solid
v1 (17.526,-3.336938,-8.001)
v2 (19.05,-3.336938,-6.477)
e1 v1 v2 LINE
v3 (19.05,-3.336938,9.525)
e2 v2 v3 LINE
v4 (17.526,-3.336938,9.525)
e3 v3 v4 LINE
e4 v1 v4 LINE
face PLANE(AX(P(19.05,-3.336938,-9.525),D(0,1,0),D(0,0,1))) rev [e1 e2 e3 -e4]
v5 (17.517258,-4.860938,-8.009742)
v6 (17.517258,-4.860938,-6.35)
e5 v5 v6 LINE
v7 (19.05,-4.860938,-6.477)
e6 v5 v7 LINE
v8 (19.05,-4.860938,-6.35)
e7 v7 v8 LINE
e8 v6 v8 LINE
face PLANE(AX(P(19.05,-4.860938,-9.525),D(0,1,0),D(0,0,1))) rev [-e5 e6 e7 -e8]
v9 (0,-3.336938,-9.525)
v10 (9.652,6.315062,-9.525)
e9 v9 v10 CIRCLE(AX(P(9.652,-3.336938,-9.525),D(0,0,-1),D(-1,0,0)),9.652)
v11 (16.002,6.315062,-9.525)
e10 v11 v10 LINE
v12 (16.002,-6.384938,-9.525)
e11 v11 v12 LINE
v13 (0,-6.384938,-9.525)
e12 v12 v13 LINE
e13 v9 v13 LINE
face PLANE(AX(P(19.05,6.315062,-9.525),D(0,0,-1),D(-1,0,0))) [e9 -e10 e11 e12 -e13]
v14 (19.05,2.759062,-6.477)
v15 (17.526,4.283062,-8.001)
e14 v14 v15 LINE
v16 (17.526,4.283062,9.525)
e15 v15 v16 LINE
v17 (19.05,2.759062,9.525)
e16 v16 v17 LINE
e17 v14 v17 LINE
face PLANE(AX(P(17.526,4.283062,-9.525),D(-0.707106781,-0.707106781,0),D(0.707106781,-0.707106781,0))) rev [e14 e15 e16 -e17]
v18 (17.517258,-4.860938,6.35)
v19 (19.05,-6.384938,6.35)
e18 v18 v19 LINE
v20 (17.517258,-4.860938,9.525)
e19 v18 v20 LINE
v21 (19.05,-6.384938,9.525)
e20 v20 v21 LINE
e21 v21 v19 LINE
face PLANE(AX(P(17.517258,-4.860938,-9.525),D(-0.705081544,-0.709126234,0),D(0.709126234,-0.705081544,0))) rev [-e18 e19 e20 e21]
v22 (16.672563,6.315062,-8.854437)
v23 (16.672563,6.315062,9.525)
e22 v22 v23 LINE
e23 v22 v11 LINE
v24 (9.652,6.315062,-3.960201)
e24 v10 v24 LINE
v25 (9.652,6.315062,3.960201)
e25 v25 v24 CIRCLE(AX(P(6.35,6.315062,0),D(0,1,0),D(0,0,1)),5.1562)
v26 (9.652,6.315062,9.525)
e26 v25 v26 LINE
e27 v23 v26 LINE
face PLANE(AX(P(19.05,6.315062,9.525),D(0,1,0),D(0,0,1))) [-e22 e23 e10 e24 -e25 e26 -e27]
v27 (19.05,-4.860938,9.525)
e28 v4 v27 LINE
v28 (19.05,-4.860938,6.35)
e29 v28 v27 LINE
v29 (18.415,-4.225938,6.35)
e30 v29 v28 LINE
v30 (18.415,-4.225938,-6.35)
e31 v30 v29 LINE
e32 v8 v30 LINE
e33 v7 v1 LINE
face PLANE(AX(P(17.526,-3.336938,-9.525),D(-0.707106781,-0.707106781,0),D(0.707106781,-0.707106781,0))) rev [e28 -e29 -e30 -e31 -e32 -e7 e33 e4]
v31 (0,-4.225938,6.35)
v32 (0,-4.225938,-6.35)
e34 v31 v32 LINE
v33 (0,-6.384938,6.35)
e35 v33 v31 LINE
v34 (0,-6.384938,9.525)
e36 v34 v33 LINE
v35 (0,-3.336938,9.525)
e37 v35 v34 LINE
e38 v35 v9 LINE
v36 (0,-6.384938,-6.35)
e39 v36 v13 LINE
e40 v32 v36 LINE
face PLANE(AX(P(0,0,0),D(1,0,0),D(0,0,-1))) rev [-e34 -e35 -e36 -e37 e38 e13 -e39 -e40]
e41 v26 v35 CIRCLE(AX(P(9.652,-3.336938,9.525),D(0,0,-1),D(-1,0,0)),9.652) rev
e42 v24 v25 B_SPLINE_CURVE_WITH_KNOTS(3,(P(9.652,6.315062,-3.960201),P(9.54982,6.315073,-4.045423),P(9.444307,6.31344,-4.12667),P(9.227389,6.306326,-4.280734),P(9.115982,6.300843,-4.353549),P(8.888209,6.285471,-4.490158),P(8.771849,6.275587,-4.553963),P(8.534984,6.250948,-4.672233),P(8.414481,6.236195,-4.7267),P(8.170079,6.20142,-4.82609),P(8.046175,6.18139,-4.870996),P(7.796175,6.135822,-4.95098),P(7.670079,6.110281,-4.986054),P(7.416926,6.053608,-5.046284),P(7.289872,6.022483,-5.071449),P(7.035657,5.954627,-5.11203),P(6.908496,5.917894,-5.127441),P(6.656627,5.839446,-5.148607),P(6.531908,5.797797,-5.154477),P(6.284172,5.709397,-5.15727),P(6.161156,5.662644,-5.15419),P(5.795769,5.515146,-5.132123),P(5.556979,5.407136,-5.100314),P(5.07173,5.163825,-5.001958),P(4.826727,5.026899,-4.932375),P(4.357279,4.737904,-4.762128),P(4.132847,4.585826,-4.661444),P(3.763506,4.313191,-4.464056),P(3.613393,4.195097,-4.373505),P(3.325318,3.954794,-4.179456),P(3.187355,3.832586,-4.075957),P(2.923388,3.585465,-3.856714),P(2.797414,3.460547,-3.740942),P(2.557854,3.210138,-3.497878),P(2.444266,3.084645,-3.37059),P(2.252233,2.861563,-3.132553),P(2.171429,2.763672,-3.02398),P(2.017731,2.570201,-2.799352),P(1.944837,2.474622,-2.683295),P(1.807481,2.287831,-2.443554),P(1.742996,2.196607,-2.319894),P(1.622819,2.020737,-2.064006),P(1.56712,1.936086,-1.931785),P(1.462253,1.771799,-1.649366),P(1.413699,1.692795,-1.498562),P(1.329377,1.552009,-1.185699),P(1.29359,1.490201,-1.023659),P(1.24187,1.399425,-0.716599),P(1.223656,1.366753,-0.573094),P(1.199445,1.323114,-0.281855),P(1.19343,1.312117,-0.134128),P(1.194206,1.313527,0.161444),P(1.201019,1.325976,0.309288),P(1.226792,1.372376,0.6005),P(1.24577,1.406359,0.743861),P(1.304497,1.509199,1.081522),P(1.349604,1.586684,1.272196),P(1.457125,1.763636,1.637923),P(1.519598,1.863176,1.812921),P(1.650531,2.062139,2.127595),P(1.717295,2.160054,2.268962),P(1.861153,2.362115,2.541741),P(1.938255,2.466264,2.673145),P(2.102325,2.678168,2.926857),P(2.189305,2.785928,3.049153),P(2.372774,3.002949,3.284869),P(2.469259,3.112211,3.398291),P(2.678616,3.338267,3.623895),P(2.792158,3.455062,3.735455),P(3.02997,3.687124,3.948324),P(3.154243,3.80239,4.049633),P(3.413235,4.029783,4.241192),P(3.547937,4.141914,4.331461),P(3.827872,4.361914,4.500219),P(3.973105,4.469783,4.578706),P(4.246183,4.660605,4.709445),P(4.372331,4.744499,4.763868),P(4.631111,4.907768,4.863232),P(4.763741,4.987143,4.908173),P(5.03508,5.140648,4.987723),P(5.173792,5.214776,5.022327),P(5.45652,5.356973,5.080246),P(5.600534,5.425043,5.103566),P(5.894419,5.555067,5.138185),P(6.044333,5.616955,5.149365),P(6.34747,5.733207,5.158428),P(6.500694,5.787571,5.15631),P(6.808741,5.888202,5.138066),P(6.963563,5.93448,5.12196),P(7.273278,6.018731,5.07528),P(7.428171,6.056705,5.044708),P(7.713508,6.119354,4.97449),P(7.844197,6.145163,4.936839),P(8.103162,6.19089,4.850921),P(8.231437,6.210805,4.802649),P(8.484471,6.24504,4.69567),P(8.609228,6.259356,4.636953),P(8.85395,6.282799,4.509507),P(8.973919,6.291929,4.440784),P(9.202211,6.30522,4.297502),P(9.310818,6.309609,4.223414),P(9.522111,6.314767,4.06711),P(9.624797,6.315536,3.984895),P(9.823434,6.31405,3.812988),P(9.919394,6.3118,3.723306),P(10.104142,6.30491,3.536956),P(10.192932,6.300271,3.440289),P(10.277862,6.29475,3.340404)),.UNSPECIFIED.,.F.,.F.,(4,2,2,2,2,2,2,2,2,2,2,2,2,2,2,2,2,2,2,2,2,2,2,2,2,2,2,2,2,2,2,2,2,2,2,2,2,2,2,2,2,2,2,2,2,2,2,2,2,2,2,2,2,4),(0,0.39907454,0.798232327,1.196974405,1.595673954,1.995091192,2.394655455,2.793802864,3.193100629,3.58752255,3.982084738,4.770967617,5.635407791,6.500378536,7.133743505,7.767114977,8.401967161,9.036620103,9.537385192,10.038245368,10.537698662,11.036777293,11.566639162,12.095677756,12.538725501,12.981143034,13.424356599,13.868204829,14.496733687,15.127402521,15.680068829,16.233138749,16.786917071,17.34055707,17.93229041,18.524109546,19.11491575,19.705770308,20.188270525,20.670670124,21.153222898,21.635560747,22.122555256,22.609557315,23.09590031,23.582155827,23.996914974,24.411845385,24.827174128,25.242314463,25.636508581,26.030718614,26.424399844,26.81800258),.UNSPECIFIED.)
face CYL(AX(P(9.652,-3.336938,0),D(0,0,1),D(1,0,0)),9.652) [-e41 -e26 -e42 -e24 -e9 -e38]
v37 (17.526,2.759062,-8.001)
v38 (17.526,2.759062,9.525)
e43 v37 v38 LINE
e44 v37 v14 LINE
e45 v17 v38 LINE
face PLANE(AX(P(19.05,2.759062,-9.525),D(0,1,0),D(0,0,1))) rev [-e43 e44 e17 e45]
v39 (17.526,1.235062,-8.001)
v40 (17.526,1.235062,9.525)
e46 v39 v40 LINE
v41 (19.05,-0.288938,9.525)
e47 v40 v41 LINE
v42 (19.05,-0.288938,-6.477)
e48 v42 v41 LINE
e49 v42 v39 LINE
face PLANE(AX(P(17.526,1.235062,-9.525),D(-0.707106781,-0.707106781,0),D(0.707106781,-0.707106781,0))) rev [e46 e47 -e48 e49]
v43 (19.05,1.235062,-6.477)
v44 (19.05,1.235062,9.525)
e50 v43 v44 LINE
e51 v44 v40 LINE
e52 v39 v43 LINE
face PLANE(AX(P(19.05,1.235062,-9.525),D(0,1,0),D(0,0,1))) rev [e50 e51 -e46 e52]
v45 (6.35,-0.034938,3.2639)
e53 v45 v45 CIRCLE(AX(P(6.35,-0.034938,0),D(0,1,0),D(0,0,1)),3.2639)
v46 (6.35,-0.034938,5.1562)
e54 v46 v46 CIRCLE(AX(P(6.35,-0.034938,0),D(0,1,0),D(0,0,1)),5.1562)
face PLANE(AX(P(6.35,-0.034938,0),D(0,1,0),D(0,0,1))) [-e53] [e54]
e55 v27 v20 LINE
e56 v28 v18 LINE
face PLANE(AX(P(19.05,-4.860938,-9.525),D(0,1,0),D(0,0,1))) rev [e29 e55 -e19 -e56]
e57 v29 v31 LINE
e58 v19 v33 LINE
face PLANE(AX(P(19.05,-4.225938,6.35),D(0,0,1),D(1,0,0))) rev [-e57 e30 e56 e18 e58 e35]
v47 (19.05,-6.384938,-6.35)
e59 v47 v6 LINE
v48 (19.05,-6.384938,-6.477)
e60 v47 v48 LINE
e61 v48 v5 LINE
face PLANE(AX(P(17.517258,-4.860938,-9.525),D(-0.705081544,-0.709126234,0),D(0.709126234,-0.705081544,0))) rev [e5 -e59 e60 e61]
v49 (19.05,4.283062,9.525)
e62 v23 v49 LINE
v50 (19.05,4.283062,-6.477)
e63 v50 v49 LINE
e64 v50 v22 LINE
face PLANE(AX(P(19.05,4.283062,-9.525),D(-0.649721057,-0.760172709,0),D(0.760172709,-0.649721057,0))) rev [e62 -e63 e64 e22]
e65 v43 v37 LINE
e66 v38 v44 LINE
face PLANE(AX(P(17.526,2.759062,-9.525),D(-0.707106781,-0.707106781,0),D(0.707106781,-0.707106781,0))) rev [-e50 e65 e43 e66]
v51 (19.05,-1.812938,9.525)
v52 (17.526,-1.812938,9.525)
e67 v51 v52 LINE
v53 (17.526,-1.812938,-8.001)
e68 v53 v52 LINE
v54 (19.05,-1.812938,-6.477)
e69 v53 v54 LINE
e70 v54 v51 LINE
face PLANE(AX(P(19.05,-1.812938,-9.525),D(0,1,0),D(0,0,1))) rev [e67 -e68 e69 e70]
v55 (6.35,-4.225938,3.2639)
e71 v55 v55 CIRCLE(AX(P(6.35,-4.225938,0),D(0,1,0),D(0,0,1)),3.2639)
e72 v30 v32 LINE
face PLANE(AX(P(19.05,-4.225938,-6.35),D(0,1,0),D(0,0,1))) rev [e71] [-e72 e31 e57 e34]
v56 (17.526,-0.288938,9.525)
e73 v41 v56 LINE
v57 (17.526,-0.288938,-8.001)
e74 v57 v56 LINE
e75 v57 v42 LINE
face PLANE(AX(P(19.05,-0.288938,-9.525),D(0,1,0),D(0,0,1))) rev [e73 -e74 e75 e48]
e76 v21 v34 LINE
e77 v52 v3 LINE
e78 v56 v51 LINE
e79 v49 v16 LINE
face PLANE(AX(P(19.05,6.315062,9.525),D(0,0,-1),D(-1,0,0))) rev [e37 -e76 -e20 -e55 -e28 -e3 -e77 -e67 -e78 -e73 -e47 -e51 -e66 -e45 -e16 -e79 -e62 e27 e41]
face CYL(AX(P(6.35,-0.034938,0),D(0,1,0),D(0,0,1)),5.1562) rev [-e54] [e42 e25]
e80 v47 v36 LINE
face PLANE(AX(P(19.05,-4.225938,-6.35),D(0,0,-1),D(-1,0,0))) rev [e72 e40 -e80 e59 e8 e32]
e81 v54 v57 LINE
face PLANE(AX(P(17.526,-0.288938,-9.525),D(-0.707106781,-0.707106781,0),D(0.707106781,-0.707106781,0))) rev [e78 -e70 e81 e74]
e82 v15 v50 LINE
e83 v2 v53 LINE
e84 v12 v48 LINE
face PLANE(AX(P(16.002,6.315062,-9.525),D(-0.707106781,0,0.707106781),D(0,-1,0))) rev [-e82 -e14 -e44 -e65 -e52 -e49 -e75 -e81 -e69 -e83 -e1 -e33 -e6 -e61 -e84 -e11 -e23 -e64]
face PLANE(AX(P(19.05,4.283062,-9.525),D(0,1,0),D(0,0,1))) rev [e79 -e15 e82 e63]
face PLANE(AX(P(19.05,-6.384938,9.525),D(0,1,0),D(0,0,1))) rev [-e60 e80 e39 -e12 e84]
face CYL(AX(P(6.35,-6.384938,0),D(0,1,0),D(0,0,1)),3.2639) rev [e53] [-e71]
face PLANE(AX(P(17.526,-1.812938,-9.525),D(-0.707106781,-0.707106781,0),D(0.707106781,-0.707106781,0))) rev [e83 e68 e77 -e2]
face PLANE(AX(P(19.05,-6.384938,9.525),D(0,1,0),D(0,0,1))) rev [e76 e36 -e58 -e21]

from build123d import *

# Parameters (mm, degrees)
CROQUIS1_W              = 19.05
CROQUIS1_H              = 12.7
SALIENTE_EXTRUIR1_DEPTH = 19.05
CROQUIS2_W              = 12.7
CROQUIS2_H              = 2.159
CORTAR_EXTRUIR1_DEPTH   = 23.235007389
CHAFL_N1_SIZE           = 3.048
CROQUIS9_R              = 5.1562
CORTAR_EXTRUIR4_DEPTH   = 6.35
CROQUIS17_R             = 3.2639
CORTAR_EXTRUIR5_DEPTH   = 25.797542721
REDONDEO1_START         = -9.525
REDONDEO1_DEPTH         = 19.05
CORTAR_EXTRUIR6_DEPTH   = 28.687044486
CORTAR_EXTRUIR7_DEPTH   = 28.687044486
CORTAR_EXTRUIR8_DEPTH   = 28.687044486
CORTAR_EXTRUIR9_DEPTH   = 28.687044486
CORTAR_EXTRUIR10_DEPTH  = 28.687044486
CORTAR_EXTRUIR11_DEPTH  = 28.687044486
CORTAR_EXTRUIR12_DEPTH  = 28.687044486
CORTAR_EXTRUIR13_DEPTH  = 28.687044486


with BuildPart() as part:
    # Croquis1 → Saliente-Extruir1 (new body)
    with BuildSketch(Plane(origin=(0, 0, 0), x_dir=(0, 0, -1), z_dir=(1, 0, 0))):
        with Locations((0, -0.034937632)):
            Rectangle(CROQUIS1_W, CROQUIS1_H)
    extrude(amount=SALIENTE_EXTRUIR1_DEPTH)

    # Croquis2 → Cortar-Extruir1 (cut, through all)
    with BuildSketch(Plane.ZY):
        with Locations((0, -5.305437632)):
            Rectangle(CROQUIS2_W, CROQUIS2_H)
    extrude(amount=-CORTAR_EXTRUIR1_DEPTH, mode=Mode.SUBTRACT)

    # Chaflán1
    chafl_n1_edges = [part.edges().sort_by_distance(p)[0] for p in [
        (19.05, -0.034937632, -9.525),
    ]]
    chamfer(chafl_n1_edges, length=CHAFL_N1_SIZE)

    # Croquis9 → Cortar-Extruir4 (cut)
    with BuildSketch(Plane(origin=(0, 6.315062368, 0), x_dir=(1, 0, 0), z_dir=(0, 1, 0))):
        with Locations(Location((6.35, 0, 0), (0, 0, 270))):
            Circle(CROQUIS9_R)
    extrude(amount=-CORTAR_EXTRUIR4_DEPTH, mode=Mode.SUBTRACT)

    # Croquis17 → Cortar-Extruir5 (cut, through all)
    with BuildSketch(Plane(origin=(0, 6.315062368, 0), x_dir=(1, 0, 0), z_dir=(0, 1, 0))):
        with Locations(Location((6.35, 0, 0), (0, 0, 270))):
            Circle(CROQUIS17_R)
    extrude(amount=-CORTAR_EXTRUIR5_DEPTH, mode=Mode.SUBTRACT)

    # Redondeo1: read off the stored shape, not the designer's step
    # Redondeo1 outline → Redondeo1 (cut)
    with BuildSketch(Plane.XY.offset(REDONDEO1_START)):
        with BuildLine():
            ThreePointArc((0, -3.336937632), (2.827005348, 3.48805702), (9.652, 6.315062368))
            Line((9.652, 6.315062368), (0, 6.315062368))
            Line((0, 6.315062368), (0, -3.336937632))
        make_face()
    extrude(amount=REDONDEO1_DEPTH, mode=Mode.SUBTRACT)

    # Croquis20 → Cortar-Extruir6 (cut, through all)
    with BuildSketch(Plane.XY.offset(9.525)):
        Polygon((19.05, -6.384937632), (19.05, -4.860937632), (17.517257595, -4.860937632), align=None)
    extrude(amount=-CORTAR_EXTRUIR6_DEPTH, mode=Mode.SUBTRACT)

    # Croquis21 → Cortar-Extruir7 (cut, through all)
    with BuildSketch(Plane.XY.offset(9.525)):
        Polygon((19.05, -4.860937632), (19.05, -3.336937632), (17.526, -3.336937632), align=None)
    extrude(amount=-CORTAR_EXTRUIR7_DEPTH, mode=Mode.SUBTRACT)

    # Croquis22 → Cortar-Extruir8 (cut, through all)
    with BuildSketch(Plane.XY.offset(9.525)):
        Polygon((19.05, -3.336937632), (19.05, -1.812937632), (17.526, -1.812937632), align=None)
    extrude(amount=-CORTAR_EXTRUIR8_DEPTH, mode=Mode.SUBTRACT)

    # Croquis23 → Cortar-Extruir9 (cut, through all)
    with BuildSketch(Plane.XY.offset(9.525)):
        Polygon((19.05, -1.812937632), (19.05, -0.288937632), (17.526, -0.288937632), align=None)
    extrude(amount=-CORTAR_EXTRUIR9_DEPTH, mode=Mode.SUBTRACT)

    # Croquis24 → Cortar-Extruir10 (cut, through all)
    with BuildSketch(Plane.XY.offset(9.525)):
        Polygon((19.05, -0.288937632), (19.05, 1.235062368), (17.526, 1.235062368), align=None)
    extrude(amount=-CORTAR_EXTRUIR10_DEPTH, mode=Mode.SUBTRACT)

    # Croquis25 → Cortar-Extruir11 (cut, through all)
    with BuildSketch(Plane.XY.offset(9.525)):
        Polygon((19.05, 1.235062368), (19.05, 2.759062368), (17.526, 2.759062368), align=None)
    extrude(amount=-CORTAR_EXTRUIR11_DEPTH, mode=Mode.SUBTRACT)

    # Croquis26 → Cortar-Extruir12 (cut, through all)
    with BuildSketch(Plane.XY.offset(9.525)):
        Polygon((19.05, 2.759062368), (19.05, 4.283062368), (17.526, 4.283062368), align=None)
    extrude(amount=-CORTAR_EXTRUIR12_DEPTH, mode=Mode.SUBTRACT)

    # Croquis27 → Cortar-Extruir13 (cut, through all)
    with BuildSketch(Plane.XY.offset(9.525)):
        Polygon((19.05, 4.283062368), (16.672562903, 6.315062368), (19.05, 6.315062368), align=None)
    extrude(amount=-CORTAR_EXTRUIR13_DEPTH, mode=Mode.SUBTRACT)


solid = part.part
